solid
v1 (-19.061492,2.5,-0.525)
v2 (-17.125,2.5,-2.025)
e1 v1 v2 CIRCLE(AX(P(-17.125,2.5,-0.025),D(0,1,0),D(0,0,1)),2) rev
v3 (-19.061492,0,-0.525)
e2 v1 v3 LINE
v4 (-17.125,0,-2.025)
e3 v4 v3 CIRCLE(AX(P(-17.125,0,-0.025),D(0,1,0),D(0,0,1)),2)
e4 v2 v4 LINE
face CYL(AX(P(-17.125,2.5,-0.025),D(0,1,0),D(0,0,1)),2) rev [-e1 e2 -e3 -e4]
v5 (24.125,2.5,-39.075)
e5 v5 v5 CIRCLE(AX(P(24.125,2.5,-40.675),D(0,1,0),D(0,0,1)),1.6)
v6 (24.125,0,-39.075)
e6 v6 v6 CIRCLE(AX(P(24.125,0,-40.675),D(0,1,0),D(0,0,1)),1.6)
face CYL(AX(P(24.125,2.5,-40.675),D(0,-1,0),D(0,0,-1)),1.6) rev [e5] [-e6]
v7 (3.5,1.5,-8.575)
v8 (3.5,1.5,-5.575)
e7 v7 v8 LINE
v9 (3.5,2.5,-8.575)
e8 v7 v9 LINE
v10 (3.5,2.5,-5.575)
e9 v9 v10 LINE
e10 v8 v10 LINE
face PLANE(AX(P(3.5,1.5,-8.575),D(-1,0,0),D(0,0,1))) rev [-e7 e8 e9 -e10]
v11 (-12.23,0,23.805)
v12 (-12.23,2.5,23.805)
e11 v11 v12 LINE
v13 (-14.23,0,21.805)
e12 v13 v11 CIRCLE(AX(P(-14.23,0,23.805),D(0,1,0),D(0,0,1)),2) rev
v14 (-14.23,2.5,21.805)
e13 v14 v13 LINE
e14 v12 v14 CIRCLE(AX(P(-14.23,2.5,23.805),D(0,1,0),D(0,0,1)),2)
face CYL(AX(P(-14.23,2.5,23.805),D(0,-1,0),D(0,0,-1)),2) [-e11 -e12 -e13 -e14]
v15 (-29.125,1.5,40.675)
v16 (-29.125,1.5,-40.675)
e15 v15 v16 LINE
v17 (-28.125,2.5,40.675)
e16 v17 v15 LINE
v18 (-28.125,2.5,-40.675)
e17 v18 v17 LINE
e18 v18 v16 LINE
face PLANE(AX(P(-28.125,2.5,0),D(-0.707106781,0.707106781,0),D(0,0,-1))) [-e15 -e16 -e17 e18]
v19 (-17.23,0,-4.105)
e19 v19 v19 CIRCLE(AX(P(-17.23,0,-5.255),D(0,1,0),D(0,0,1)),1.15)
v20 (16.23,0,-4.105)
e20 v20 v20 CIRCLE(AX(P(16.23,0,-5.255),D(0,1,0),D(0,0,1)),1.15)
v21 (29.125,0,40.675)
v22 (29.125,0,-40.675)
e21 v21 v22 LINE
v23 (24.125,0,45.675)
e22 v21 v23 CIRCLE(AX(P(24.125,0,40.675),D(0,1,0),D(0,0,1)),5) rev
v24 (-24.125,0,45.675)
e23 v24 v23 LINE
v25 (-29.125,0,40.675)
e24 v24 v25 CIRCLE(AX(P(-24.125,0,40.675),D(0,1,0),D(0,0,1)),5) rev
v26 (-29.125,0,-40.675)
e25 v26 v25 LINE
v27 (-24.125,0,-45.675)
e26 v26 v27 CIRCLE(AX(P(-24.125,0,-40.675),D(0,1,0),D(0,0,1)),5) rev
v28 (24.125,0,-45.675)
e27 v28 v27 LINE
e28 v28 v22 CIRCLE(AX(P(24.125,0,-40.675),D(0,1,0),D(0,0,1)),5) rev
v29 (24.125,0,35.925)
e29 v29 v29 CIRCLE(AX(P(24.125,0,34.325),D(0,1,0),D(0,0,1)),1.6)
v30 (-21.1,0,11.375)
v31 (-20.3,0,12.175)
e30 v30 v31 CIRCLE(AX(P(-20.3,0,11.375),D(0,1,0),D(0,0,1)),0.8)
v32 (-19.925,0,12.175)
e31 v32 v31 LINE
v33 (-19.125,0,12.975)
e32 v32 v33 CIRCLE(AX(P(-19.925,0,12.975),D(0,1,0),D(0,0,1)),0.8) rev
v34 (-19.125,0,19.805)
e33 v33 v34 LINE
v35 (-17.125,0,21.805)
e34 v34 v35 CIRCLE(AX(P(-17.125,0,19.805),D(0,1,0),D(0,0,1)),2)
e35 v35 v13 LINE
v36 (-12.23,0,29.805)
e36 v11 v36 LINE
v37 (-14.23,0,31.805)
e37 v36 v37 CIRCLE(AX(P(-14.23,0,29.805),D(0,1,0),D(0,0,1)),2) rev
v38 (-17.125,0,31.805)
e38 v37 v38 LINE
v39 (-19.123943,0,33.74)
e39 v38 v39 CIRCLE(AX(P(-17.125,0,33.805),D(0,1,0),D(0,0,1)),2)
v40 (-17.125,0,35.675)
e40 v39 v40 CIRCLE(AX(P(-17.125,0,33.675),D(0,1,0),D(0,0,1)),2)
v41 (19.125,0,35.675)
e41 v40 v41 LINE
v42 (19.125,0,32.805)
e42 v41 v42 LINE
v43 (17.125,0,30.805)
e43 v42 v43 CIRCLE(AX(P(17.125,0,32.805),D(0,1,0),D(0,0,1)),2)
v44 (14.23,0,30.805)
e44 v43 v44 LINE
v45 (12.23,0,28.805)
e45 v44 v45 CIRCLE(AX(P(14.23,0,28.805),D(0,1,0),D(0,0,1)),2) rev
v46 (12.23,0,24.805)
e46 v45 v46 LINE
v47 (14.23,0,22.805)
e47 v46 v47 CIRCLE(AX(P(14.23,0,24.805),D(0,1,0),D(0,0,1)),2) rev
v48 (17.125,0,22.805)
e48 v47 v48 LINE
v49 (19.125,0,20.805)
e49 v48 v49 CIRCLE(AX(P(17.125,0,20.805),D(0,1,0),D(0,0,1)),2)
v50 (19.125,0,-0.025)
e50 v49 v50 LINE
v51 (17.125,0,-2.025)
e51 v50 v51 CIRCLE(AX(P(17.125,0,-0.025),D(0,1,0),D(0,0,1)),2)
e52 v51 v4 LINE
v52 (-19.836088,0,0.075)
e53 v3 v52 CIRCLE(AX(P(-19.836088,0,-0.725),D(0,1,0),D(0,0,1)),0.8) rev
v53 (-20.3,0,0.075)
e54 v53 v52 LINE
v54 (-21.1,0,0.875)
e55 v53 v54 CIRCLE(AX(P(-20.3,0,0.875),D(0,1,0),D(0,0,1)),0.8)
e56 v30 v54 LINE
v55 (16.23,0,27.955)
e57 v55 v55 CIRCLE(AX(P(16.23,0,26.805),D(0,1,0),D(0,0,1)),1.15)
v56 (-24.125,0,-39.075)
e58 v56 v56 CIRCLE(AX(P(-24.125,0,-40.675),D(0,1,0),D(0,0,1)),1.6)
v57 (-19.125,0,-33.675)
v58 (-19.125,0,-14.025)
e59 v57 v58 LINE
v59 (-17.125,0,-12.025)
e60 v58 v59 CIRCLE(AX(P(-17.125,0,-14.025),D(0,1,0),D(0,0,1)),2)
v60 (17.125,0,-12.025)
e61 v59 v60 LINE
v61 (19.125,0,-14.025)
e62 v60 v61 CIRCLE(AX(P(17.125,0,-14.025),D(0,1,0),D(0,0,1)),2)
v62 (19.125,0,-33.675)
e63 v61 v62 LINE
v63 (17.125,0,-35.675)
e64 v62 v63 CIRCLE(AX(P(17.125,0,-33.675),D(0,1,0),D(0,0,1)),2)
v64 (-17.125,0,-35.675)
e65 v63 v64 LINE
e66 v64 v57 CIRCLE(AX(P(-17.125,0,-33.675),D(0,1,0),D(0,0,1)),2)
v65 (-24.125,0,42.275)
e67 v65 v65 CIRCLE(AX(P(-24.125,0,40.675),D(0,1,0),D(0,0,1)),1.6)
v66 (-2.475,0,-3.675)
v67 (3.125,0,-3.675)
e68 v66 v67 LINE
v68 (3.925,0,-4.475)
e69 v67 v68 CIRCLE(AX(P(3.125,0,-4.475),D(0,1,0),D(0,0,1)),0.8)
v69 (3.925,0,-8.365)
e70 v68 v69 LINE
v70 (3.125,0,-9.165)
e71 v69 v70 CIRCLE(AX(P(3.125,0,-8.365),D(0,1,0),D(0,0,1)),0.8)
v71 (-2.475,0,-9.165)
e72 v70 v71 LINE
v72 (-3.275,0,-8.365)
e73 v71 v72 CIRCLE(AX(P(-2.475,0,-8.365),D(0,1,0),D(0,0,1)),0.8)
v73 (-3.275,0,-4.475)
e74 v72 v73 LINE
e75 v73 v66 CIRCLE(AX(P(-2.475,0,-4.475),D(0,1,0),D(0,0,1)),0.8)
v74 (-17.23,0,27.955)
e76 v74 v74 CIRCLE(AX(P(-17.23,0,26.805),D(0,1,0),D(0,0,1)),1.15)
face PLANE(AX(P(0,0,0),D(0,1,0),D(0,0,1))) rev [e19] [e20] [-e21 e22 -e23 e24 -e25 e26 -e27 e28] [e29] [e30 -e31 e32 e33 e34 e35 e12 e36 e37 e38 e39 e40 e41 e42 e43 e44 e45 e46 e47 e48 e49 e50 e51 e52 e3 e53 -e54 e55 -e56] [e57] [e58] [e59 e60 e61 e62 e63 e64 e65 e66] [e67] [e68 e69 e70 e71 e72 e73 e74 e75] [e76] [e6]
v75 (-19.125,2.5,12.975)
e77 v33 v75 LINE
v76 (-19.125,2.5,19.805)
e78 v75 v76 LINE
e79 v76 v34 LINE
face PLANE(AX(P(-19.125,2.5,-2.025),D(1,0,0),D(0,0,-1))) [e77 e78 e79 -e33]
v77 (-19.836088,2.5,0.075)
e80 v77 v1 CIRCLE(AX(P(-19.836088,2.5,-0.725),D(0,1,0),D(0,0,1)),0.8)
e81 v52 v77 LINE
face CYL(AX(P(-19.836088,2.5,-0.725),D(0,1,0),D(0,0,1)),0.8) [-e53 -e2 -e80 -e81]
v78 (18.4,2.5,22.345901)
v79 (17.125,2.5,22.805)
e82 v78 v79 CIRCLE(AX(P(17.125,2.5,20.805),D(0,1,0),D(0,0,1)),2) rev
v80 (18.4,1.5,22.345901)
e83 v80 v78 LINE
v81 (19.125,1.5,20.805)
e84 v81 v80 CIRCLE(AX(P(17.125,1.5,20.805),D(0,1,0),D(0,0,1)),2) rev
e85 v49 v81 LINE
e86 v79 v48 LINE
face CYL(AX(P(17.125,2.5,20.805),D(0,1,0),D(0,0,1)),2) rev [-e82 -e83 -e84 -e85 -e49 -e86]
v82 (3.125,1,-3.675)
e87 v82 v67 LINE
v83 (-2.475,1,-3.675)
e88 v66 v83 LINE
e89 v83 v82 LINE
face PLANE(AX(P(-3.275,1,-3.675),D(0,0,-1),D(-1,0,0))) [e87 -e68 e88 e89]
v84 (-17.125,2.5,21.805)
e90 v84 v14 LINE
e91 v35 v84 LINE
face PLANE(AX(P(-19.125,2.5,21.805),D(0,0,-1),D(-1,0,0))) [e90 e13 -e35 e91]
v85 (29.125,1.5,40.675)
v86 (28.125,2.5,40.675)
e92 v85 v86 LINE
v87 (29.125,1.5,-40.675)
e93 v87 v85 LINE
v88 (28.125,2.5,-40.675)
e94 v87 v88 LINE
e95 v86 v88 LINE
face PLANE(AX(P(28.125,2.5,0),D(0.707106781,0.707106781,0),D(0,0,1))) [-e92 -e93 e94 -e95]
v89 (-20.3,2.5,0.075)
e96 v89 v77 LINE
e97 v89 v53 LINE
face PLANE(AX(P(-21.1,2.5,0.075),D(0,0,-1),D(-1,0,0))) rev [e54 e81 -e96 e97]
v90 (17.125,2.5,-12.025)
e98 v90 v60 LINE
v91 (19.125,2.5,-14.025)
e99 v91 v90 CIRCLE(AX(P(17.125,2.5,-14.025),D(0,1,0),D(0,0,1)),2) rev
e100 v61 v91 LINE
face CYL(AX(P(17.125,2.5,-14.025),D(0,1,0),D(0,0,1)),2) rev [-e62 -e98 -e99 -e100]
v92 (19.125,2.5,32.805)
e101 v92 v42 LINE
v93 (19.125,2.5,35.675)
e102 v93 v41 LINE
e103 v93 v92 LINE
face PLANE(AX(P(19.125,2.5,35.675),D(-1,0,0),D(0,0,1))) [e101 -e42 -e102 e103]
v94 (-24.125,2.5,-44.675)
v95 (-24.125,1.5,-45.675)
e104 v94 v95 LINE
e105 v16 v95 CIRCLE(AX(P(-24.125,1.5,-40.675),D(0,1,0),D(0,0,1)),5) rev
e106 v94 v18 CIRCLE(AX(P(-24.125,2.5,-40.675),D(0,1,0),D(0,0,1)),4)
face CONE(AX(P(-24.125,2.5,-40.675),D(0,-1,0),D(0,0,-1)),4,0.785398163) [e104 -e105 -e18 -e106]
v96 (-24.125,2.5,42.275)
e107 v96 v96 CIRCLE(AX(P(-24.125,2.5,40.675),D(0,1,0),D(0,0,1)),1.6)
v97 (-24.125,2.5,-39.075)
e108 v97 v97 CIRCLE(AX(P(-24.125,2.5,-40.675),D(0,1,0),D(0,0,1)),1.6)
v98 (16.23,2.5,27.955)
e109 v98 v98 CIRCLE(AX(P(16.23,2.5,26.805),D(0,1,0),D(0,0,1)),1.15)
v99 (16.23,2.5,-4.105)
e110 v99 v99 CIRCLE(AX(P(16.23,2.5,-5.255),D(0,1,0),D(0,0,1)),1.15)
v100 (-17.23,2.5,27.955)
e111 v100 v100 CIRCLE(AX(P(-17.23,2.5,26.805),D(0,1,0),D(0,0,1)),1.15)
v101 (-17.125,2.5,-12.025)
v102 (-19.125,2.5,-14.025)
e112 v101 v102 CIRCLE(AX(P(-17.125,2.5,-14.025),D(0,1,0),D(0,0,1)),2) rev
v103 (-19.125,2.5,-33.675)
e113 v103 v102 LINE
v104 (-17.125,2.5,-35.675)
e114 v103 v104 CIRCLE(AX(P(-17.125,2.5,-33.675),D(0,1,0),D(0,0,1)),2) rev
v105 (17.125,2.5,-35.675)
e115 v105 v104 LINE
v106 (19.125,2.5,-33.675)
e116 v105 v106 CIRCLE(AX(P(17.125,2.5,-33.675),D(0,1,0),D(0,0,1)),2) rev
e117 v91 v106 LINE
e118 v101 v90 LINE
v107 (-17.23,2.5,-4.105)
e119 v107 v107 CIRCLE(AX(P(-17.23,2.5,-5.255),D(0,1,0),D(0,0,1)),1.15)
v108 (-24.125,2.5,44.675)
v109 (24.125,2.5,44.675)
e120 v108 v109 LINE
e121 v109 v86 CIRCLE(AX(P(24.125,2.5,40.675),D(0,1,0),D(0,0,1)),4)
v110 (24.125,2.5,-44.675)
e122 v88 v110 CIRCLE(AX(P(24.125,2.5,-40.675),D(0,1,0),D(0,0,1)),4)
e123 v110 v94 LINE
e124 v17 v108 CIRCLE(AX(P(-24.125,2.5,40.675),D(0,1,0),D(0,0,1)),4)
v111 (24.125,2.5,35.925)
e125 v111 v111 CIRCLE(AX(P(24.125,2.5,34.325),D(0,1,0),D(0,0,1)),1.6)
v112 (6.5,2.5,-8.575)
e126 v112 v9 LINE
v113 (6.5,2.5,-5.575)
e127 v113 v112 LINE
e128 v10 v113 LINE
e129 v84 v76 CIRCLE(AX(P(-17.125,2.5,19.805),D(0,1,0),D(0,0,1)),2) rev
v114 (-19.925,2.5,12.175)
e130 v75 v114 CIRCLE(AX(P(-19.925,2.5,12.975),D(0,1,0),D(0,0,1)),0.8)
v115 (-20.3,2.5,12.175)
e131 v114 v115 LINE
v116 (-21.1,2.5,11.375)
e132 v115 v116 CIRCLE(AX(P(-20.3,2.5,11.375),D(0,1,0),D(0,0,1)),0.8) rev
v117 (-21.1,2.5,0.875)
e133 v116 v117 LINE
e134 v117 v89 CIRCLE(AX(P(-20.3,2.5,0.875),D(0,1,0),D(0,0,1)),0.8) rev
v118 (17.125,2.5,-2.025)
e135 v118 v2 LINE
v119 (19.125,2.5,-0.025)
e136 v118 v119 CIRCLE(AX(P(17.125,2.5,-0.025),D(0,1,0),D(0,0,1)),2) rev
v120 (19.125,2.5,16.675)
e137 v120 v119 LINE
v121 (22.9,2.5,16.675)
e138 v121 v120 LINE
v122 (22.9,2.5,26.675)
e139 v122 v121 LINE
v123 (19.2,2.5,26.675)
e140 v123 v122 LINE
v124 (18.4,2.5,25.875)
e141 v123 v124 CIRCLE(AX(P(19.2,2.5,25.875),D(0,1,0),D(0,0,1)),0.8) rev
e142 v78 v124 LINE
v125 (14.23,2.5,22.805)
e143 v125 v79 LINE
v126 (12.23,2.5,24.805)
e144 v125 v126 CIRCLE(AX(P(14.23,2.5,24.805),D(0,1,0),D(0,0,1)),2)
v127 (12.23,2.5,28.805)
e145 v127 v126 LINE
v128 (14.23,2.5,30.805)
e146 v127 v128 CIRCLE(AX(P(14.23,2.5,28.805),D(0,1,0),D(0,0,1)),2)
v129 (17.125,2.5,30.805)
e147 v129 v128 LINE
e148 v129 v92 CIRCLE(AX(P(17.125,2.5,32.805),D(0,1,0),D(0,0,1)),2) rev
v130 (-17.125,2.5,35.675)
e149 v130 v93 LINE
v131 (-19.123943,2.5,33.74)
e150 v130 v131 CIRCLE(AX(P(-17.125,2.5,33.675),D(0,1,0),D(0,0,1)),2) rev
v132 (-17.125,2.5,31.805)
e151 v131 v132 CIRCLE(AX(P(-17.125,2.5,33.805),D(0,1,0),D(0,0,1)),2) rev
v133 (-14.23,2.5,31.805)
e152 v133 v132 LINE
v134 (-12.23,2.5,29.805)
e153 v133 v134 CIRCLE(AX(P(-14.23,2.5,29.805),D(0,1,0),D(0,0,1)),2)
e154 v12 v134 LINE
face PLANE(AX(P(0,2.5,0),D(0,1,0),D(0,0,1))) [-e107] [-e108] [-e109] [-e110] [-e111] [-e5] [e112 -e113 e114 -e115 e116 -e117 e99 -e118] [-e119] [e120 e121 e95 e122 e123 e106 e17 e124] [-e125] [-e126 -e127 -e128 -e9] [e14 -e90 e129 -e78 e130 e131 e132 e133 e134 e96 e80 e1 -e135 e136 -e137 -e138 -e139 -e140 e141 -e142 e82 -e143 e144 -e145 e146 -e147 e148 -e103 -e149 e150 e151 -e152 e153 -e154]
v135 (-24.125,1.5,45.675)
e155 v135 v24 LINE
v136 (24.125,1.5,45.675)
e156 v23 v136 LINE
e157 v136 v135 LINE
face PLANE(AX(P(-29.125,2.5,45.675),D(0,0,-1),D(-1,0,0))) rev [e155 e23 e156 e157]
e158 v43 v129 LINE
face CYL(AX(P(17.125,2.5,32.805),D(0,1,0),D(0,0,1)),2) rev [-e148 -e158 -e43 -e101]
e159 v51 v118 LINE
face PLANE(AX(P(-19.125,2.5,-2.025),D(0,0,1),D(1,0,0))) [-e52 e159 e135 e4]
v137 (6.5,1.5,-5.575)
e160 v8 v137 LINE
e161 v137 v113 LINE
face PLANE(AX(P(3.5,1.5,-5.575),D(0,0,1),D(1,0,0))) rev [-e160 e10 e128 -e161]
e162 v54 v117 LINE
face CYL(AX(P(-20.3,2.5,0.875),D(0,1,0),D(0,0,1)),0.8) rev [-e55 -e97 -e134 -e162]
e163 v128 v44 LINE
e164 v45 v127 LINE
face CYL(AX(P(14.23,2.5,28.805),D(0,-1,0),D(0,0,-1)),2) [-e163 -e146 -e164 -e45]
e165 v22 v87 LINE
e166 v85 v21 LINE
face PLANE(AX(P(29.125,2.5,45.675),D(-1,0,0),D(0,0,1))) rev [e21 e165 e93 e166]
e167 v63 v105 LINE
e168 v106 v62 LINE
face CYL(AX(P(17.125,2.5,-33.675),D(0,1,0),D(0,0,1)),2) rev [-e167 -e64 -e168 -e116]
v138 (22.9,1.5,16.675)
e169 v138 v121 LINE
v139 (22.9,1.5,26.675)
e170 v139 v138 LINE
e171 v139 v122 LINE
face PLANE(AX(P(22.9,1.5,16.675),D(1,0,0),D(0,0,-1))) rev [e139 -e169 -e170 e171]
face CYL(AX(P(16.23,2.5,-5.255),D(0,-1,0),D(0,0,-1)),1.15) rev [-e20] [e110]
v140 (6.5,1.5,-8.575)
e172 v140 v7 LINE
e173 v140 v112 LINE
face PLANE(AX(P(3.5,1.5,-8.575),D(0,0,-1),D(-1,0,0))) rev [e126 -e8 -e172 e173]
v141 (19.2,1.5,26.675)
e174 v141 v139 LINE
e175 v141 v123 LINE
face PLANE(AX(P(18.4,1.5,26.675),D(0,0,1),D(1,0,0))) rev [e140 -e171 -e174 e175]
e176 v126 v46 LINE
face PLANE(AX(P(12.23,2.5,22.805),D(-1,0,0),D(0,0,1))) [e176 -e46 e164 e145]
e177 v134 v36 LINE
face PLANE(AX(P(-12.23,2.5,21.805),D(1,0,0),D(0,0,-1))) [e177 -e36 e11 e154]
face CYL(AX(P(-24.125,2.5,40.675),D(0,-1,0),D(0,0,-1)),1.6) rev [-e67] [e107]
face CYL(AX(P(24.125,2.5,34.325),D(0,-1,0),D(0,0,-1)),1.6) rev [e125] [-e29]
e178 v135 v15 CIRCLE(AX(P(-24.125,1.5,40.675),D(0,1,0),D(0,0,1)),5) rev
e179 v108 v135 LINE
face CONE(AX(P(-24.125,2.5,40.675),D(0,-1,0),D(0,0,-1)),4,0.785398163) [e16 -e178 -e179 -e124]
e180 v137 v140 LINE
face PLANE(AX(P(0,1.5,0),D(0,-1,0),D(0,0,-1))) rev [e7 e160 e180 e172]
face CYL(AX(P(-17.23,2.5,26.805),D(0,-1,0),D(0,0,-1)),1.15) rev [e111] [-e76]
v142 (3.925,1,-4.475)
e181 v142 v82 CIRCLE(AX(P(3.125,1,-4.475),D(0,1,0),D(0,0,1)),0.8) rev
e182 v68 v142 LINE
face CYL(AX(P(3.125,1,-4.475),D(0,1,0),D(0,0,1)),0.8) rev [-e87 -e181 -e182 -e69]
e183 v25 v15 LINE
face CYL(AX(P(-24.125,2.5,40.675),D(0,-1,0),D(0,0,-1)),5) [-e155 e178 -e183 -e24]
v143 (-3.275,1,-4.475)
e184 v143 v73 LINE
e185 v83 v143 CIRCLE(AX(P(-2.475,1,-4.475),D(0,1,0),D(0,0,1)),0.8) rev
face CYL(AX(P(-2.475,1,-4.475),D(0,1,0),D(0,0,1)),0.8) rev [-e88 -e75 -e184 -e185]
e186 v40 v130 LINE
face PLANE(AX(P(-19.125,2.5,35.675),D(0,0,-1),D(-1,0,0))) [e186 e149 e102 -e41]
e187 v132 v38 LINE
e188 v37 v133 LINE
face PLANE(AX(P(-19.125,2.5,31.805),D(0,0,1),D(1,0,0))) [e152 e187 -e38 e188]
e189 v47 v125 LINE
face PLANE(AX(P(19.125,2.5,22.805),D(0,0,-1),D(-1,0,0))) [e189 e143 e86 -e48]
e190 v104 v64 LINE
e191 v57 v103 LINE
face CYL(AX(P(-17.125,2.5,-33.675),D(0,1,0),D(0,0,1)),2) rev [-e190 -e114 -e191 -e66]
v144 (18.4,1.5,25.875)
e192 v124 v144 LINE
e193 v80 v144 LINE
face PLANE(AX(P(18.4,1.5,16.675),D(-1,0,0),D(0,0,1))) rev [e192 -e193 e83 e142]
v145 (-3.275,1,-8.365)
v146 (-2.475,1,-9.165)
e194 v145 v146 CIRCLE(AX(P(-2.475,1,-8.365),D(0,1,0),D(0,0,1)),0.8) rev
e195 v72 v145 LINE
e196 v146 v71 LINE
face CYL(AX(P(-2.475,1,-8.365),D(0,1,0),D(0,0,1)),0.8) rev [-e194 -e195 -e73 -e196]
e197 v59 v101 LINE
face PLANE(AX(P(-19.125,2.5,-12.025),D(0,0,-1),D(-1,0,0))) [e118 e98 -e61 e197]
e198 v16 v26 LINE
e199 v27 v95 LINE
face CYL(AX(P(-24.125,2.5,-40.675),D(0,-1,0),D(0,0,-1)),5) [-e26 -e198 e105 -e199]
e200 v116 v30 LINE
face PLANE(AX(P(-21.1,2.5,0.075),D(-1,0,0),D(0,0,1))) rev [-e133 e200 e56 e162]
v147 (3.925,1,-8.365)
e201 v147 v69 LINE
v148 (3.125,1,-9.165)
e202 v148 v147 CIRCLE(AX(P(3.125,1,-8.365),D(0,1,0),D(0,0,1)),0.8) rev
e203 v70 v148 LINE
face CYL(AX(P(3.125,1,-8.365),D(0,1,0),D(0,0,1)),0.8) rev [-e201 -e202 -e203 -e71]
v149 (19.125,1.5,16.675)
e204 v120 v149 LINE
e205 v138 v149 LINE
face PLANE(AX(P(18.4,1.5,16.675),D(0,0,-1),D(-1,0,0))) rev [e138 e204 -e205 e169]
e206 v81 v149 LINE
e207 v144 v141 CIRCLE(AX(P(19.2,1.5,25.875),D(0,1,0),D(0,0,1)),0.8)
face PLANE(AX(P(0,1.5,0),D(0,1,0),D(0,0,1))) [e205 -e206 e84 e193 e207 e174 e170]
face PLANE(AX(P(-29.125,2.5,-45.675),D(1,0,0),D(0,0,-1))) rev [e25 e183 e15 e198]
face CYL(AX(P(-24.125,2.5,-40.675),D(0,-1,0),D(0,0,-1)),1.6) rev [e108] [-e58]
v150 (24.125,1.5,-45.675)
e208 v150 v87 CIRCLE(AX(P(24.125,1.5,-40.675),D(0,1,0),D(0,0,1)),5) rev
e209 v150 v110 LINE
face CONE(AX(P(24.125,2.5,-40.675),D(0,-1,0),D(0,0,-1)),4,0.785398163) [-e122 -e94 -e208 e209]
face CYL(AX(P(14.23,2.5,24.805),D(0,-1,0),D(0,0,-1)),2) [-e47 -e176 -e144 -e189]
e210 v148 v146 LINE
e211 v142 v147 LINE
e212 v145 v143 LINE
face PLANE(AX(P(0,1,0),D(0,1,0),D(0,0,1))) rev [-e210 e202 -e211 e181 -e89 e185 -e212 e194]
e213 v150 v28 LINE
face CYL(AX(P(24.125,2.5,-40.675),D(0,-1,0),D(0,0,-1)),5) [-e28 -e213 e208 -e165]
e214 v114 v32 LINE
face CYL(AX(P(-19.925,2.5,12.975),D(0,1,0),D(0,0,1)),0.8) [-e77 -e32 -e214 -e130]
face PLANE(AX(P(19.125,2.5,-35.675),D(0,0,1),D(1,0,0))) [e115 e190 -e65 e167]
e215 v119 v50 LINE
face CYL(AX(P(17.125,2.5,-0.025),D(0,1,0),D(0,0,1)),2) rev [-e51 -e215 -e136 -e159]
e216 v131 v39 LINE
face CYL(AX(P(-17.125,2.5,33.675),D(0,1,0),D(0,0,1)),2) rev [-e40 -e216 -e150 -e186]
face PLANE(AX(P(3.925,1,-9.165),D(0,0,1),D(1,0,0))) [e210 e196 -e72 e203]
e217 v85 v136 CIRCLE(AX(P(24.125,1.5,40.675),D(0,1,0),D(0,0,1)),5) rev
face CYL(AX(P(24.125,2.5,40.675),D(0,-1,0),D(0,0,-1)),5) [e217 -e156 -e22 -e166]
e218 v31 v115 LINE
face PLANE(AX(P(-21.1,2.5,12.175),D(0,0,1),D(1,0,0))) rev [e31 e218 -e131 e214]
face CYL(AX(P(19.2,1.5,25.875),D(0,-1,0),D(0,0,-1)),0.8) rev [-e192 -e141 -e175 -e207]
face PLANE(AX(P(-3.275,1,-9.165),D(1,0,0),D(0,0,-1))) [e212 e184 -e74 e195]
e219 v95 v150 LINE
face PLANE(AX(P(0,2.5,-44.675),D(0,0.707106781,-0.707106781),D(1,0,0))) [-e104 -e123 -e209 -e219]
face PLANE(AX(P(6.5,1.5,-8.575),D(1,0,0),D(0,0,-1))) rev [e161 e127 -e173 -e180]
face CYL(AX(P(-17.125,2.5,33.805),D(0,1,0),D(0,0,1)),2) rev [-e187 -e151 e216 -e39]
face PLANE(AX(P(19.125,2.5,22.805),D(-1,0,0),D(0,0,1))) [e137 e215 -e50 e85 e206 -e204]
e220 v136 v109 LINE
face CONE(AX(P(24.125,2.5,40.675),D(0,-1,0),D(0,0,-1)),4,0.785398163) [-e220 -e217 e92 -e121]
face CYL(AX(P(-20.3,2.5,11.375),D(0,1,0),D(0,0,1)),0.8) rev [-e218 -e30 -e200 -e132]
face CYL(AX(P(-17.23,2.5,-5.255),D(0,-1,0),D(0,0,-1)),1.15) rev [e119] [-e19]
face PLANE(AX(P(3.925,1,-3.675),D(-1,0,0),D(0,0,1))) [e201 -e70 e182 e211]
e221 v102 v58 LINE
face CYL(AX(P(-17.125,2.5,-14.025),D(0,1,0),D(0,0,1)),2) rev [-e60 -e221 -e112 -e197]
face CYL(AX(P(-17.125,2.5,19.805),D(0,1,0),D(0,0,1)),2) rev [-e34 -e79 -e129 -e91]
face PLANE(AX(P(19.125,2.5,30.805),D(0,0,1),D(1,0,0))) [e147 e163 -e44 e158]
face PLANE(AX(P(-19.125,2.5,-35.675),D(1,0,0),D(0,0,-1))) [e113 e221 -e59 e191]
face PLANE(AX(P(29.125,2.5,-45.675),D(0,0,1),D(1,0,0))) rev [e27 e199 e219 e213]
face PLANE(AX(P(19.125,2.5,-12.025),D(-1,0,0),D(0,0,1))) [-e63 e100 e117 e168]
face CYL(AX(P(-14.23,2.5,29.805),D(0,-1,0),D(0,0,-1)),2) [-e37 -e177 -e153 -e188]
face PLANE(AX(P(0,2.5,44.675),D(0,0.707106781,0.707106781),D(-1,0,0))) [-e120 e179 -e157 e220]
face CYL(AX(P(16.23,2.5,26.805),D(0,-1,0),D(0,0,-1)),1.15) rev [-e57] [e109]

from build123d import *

# Parameters (mm, degrees)
SKETCH5_W           = 58.25
SKETCH5_H           = 91.35
SKETCH5_R           = 1.15
SKETCH5_R_2         = 1.6
SKETCH5_W_2         = 38.25
SKETCH5_H_2         = 23.65
BOSS_EXTRUDE1_DEPTH = 2.5
SKETCH8_W           = 4.5
SKETCH8_H           = 10
SKETCH8_W_2         = 3
SKETCH8_H_2         = 3
CUT_EXTRUDE1_DEPTH  = 1
FILLET1_R           = 2
FILLET2_R           = 5
SKETCH9_W           = 6.8
SKETCH9_H           = 12.1
CUT_EXTRUDE2_DEPTH  = 55.228417366
SKETCH10_W          = 7.2
SKETCH10_H          = 5.49
CUT_EXTRUDE3_DEPTH  = 1
FILLET3_R           = 0.8
CHAMFER3_SIZE       = 1


with BuildPart() as part:
    # Sketch5 → Boss-Extrude1 (new body)
    with BuildSketch(Plane(origin=(0, 0, 0), x_dir=(1, 0, 0), z_dir=(0, 1, 0))):
        Rectangle(SKETCH5_W, SKETCH5_H)
        with Locations(Location((-17.23, 5.255, 0), (0, 0, 270))):
            Circle(SKETCH5_R, mode=Mode.SUBTRACT)
        with Locations(Location((-24.125, 40.675, 0), (0, 0, 270))):
            Circle(SKETCH5_R_2, mode=Mode.SUBTRACT)
        with Locations(Location((-24.125, -40.675, 0), (0, 0, 270))):
            Circle(SKETCH5_R_2, mode=Mode.SUBTRACT)
        with Locations(Location((24.125, -34.325, 0), (0, 0, 270))):
            Circle(SKETCH5_R_2, mode=Mode.SUBTRACT)
        with Locations(Location((24.125, 40.675, 0), (0, 0, 270))):
            Circle(SKETCH5_R_2, mode=Mode.SUBTRACT)
        with Locations(Location((16.23, 5.255, 0), (0, 0, 270))):
            Circle(SKETCH5_R, mode=Mode.SUBTRACT)
        with Locations(Location((16.23, -26.805, 0), (0, 0, 270))):
            Circle(SKETCH5_R, mode=Mode.SUBTRACT)
        with Locations(Location((-17.23, -26.805, 0), (0, 0, 270))):
            Circle(SKETCH5_R, mode=Mode.SUBTRACT)
        Polygon((-19.125, 2.025), (19.125, 2.025), (19.125, -22.805), (12.23, -22.805), (12.23, -30.805), (19.125, -30.805), (19.125, -35.675), (-19.125, -35.675), (-19.125, -31.805), (-12.23, -31.805), (-12.23, -21.805), (-19.125, -21.805), align=None, mode=Mode.SUBTRACT)
        with Locations((0, 23.85)):
            Rectangle(SKETCH5_W_2, SKETCH5_H_2, mode=Mode.SUBTRACT)
    extrude(amount=BOSS_EXTRUDE1_DEPTH)

    # Sketch8 → Cut-Extrude1 (cut)
    with BuildSketch(Plane(origin=(0, 2.5, 0), x_dir=(1, 0, 0), z_dir=(0, 1, 0))):
        with Locations((20.65, -21.675)):
            Rectangle(SKETCH8_W, SKETCH8_H)
        with Locations((5, 7.075)):
            Rectangle(SKETCH8_W_2, SKETCH8_H_2)
    extrude(amount=-CUT_EXTRUDE1_DEPTH, mode=Mode.SUBTRACT)

    # Fillet1
    # the kernel refuses this fillet: 2 mm, written as the material it adds along each edge
    with BuildSketch(Plane(origin=(19.125, 0, -12.025), x_dir=(0, 0, -1), z_dir=(0, 1, 0)), Plane(origin=(19.125, 0, -35.675), x_dir=(-1, 0, 0), z_dir=(0, 1, 0)), Plane(origin=(-19.125, 0, -35.675), x_dir=(0, 0, 1), z_dir=(0, 1, 0)), Plane(origin=(19.125, 0, -2.025), x_dir=(-1, 0, 0), z_dir=(0, 1, 0)), Plane(origin=(-19.125, 0, 21.805), x_dir=(1, 0, 0), z_dir=(0, 1, 0)), Plane(origin=(19.125, 0, 30.805), x_dir=(-1, 0, 0), z_dir=(0, 1, 0)), Plane(origin=(-19.125, 0, 31.805), x_dir=(0, 0, 1), z_dir=(0, 1, 0)), Plane(origin=(-19.125, 0, 35.675), x_dir=(1, 0, 0), z_dir=(0, 1, 0))) as fillet1_piece_1:
        with BuildLine():
            CenterArc((FILLET1_R, FILLET1_R), FILLET1_R, 180, 90)
            Line((0, FILLET1_R), (0, 0))
            Line((0, 0), (FILLET1_R, 0))
        make_face()
    extrude(amount=2.5)
    with BuildSketch(Plane(origin=(-19.125, 0, -12.025), x_dir=(0, 0, -1), z_dir=(0, 1, 0)), Plane(origin=(-19.125, 0, -2.025), x_dir=(1, 0, 0), z_dir=(0, 1, 0))) as fillet1_piece_2:
        with BuildLine():
            CenterArc((FILLET1_R, -FILLET1_R), FILLET1_R, 90, 90)
            Line((0, -FILLET1_R), (0, 0))
            Line((0, 0), (FILLET1_R, 0))
        make_face()
    extrude(amount=2.5)
    with BuildSketch(Plane(origin=(19.125, 0, 22.805), x_dir=(0, 0, -1), z_dir=(0, 1, 0))) as fillet1_piece_3_section:
        with BuildLine():
            CenterArc((FILLET1_R, FILLET1_R), FILLET1_R, 180, 90)
            Line((0, FILLET1_R), (0, 0))
            Line((0, 0), (FILLET1_R, 0))
        make_face()
    fillet1_piece_3 = extrude(amount=1.5, mode=Mode.PRIVATE)
    fillet1_piece_3 = split(fillet1_piece_3, bisect_by=Plane(origin=(18.4, 0.75, 22.246257115), z_dir=(1, 0, 0)), keep=Keep.TOP, mode=Mode.PRIVATE)
    add(fillet1_piece_3)
    with BuildSketch(Plane(origin=(19.125, 0, 22.805), x_dir=(0, 0, -1), z_dir=(0, 1, 0))) as fillet1_piece_4_section:
        with BuildLine():
            CenterArc((FILLET1_R, FILLET1_R), FILLET1_R, 180, 90)
            Line((0, FILLET1_R), (0, 0))
            Line((0, 0), (FILLET1_R, 0))
        make_face()
    fillet1_piece_4 = extrude(amount=1.5, mode=Mode.PRIVATE)
    fillet1_piece_4 = split(fillet1_piece_4, bisect_by=Plane(origin=(18.4, 0.75, 22.70384679), z_dir=(-1, 0, 0)), keep=Keep.TOP, mode=Mode.PRIVATE)
    add(fillet1_piece_4)
    with BuildSketch(Plane(origin=(19.125, 0, 22.805), x_dir=(0, 0, -1), z_dir=(0, 1, 0))) as fillet1_piece_5_section:
        with BuildLine():
            CenterArc((FILLET1_R, FILLET1_R), FILLET1_R, 180, 90)
            Line((0, FILLET1_R), (0, 0))
            Line((0, 0), (FILLET1_R, 0))
        make_face()
    fillet1_piece_5 = extrude(amount=6.5, mode=Mode.PRIVATE)
    fillet1_piece_5 = split(fillet1_piece_5, bisect_by=Plane(origin=(18.018520093, 2.5, 22.70384679), z_dir=(0, -1, 0)), keep=Keep.TOP, mode=Mode.PRIVATE)
    fillet1_piece_5 = split(fillet1_piece_5, bisect_by=Plane(origin=(18.018520093, 1.5, 22.70384679), z_dir=(0, 1, 0)), keep=Keep.TOP, mode=Mode.PRIVATE)
    fillet1_piece_5 = split(fillet1_piece_5, bisect_by=Plane(origin=(18.4, 2, 22.70384679), z_dir=(-1, 0, 0)), keep=Keep.TOP, mode=Mode.PRIVATE)
    add(fillet1_piece_5)
    # the kernel refuses this fillet: 2 mm, written as the material it takes off along each edge
    with BuildSketch(Plane(origin=(12.23, -5, 30.805), x_dir=(1, 0, 0), z_dir=(0, 1, 0)), Plane(origin=(12.23, -5, 22.805), x_dir=(0, 0, 1), z_dir=(0, 1, 0)), Plane(origin=(-12.23, -5, 31.805), x_dir=(0, 0, -1), z_dir=(0, 1, 0)), Plane(origin=(-12.23, -5, 21.805), x_dir=(-1, 0, 0), z_dir=(0, 1, 0))) as fillet1_2_piece_1:
        with BuildLine():
            CenterArc((FILLET1_R, FILLET1_R), FILLET1_R, 180, 90)
            Line((0, FILLET1_R), (0, 0))
            Line((0, 0), (FILLET1_R, 0))
        make_face()
    extrude(amount=12.5, mode=Mode.SUBTRACT)

    # Fillet2
    fillet2_edges = [part.edges().sort_by_distance(p)[0] for p in [
        (29.125, 1.25, -45.675),
        (29.125, 1.25, 45.675),
        (-29.125, 1.25, 45.675),
        (-29.125, 1.25, -45.675),
    ]]
    fillet(fillet2_edges, radius=FILLET2_R)

    # Sketch9 → Cut-Extrude2 (cut, through all)
    with BuildSketch(Plane.XZ):
        with Locations((-17.7, 6.125)):
            Rectangle(SKETCH9_W, SKETCH9_H)
    extrude(amount=-CUT_EXTRUDE2_DEPTH, mode=Mode.SUBTRACT)

    # Sketch10 → Cut-Extrude3 (cut)
    with BuildSketch(Plane(origin=(0, 0, 0), x_dir=(1, 0, 0), z_dir=(0, 1, 0))):
        with Locations((0.325, 6.42)):
            Rectangle(SKETCH10_W, SKETCH10_H)
    extrude(amount=CUT_EXTRUDE3_DEPTH, mode=Mode.SUBTRACT)

    # Fillet3
    fillet3_edges = [part.edges().sort_by_distance(p)[0] for p in [
        (-19.125, 1.25, 12.175),
        (-21.1, 1.25, 12.175),
        (-19.125, 1.25, 0.075),
        (-21.1, 1.25, 0.075),
        (3.925, 0.5, -3.675),
        (3.925, 0.5, -9.165),
        (-3.275, 0.5, -9.165),
        (-3.275, 0.5, -3.675),
        (18.4, 2, 26.675),
    ]]
    fillet(fillet3_edges, radius=FILLET3_R)

    # Chamfer3
    chamfer3_edges = [part.edges().sort_by_distance(p)[0] for p in [
        (29.125, 2.5, 0),
        (0, 2.5, 45.675),
        (0, 2.5, -45.675),
        (-29.125, 2.5, 0),
        (27.660533906, 2.5, -44.210533906),
        (-27.660533906, 2.5, -44.210533906),
        (-27.660533906, 2.5, 44.210533906),
        (27.660533906, 2.5, 44.210533906),
    ]]
    chamfer(chamfer3_edges, length=CHAMFER3_SIZE)


solid = part.part
